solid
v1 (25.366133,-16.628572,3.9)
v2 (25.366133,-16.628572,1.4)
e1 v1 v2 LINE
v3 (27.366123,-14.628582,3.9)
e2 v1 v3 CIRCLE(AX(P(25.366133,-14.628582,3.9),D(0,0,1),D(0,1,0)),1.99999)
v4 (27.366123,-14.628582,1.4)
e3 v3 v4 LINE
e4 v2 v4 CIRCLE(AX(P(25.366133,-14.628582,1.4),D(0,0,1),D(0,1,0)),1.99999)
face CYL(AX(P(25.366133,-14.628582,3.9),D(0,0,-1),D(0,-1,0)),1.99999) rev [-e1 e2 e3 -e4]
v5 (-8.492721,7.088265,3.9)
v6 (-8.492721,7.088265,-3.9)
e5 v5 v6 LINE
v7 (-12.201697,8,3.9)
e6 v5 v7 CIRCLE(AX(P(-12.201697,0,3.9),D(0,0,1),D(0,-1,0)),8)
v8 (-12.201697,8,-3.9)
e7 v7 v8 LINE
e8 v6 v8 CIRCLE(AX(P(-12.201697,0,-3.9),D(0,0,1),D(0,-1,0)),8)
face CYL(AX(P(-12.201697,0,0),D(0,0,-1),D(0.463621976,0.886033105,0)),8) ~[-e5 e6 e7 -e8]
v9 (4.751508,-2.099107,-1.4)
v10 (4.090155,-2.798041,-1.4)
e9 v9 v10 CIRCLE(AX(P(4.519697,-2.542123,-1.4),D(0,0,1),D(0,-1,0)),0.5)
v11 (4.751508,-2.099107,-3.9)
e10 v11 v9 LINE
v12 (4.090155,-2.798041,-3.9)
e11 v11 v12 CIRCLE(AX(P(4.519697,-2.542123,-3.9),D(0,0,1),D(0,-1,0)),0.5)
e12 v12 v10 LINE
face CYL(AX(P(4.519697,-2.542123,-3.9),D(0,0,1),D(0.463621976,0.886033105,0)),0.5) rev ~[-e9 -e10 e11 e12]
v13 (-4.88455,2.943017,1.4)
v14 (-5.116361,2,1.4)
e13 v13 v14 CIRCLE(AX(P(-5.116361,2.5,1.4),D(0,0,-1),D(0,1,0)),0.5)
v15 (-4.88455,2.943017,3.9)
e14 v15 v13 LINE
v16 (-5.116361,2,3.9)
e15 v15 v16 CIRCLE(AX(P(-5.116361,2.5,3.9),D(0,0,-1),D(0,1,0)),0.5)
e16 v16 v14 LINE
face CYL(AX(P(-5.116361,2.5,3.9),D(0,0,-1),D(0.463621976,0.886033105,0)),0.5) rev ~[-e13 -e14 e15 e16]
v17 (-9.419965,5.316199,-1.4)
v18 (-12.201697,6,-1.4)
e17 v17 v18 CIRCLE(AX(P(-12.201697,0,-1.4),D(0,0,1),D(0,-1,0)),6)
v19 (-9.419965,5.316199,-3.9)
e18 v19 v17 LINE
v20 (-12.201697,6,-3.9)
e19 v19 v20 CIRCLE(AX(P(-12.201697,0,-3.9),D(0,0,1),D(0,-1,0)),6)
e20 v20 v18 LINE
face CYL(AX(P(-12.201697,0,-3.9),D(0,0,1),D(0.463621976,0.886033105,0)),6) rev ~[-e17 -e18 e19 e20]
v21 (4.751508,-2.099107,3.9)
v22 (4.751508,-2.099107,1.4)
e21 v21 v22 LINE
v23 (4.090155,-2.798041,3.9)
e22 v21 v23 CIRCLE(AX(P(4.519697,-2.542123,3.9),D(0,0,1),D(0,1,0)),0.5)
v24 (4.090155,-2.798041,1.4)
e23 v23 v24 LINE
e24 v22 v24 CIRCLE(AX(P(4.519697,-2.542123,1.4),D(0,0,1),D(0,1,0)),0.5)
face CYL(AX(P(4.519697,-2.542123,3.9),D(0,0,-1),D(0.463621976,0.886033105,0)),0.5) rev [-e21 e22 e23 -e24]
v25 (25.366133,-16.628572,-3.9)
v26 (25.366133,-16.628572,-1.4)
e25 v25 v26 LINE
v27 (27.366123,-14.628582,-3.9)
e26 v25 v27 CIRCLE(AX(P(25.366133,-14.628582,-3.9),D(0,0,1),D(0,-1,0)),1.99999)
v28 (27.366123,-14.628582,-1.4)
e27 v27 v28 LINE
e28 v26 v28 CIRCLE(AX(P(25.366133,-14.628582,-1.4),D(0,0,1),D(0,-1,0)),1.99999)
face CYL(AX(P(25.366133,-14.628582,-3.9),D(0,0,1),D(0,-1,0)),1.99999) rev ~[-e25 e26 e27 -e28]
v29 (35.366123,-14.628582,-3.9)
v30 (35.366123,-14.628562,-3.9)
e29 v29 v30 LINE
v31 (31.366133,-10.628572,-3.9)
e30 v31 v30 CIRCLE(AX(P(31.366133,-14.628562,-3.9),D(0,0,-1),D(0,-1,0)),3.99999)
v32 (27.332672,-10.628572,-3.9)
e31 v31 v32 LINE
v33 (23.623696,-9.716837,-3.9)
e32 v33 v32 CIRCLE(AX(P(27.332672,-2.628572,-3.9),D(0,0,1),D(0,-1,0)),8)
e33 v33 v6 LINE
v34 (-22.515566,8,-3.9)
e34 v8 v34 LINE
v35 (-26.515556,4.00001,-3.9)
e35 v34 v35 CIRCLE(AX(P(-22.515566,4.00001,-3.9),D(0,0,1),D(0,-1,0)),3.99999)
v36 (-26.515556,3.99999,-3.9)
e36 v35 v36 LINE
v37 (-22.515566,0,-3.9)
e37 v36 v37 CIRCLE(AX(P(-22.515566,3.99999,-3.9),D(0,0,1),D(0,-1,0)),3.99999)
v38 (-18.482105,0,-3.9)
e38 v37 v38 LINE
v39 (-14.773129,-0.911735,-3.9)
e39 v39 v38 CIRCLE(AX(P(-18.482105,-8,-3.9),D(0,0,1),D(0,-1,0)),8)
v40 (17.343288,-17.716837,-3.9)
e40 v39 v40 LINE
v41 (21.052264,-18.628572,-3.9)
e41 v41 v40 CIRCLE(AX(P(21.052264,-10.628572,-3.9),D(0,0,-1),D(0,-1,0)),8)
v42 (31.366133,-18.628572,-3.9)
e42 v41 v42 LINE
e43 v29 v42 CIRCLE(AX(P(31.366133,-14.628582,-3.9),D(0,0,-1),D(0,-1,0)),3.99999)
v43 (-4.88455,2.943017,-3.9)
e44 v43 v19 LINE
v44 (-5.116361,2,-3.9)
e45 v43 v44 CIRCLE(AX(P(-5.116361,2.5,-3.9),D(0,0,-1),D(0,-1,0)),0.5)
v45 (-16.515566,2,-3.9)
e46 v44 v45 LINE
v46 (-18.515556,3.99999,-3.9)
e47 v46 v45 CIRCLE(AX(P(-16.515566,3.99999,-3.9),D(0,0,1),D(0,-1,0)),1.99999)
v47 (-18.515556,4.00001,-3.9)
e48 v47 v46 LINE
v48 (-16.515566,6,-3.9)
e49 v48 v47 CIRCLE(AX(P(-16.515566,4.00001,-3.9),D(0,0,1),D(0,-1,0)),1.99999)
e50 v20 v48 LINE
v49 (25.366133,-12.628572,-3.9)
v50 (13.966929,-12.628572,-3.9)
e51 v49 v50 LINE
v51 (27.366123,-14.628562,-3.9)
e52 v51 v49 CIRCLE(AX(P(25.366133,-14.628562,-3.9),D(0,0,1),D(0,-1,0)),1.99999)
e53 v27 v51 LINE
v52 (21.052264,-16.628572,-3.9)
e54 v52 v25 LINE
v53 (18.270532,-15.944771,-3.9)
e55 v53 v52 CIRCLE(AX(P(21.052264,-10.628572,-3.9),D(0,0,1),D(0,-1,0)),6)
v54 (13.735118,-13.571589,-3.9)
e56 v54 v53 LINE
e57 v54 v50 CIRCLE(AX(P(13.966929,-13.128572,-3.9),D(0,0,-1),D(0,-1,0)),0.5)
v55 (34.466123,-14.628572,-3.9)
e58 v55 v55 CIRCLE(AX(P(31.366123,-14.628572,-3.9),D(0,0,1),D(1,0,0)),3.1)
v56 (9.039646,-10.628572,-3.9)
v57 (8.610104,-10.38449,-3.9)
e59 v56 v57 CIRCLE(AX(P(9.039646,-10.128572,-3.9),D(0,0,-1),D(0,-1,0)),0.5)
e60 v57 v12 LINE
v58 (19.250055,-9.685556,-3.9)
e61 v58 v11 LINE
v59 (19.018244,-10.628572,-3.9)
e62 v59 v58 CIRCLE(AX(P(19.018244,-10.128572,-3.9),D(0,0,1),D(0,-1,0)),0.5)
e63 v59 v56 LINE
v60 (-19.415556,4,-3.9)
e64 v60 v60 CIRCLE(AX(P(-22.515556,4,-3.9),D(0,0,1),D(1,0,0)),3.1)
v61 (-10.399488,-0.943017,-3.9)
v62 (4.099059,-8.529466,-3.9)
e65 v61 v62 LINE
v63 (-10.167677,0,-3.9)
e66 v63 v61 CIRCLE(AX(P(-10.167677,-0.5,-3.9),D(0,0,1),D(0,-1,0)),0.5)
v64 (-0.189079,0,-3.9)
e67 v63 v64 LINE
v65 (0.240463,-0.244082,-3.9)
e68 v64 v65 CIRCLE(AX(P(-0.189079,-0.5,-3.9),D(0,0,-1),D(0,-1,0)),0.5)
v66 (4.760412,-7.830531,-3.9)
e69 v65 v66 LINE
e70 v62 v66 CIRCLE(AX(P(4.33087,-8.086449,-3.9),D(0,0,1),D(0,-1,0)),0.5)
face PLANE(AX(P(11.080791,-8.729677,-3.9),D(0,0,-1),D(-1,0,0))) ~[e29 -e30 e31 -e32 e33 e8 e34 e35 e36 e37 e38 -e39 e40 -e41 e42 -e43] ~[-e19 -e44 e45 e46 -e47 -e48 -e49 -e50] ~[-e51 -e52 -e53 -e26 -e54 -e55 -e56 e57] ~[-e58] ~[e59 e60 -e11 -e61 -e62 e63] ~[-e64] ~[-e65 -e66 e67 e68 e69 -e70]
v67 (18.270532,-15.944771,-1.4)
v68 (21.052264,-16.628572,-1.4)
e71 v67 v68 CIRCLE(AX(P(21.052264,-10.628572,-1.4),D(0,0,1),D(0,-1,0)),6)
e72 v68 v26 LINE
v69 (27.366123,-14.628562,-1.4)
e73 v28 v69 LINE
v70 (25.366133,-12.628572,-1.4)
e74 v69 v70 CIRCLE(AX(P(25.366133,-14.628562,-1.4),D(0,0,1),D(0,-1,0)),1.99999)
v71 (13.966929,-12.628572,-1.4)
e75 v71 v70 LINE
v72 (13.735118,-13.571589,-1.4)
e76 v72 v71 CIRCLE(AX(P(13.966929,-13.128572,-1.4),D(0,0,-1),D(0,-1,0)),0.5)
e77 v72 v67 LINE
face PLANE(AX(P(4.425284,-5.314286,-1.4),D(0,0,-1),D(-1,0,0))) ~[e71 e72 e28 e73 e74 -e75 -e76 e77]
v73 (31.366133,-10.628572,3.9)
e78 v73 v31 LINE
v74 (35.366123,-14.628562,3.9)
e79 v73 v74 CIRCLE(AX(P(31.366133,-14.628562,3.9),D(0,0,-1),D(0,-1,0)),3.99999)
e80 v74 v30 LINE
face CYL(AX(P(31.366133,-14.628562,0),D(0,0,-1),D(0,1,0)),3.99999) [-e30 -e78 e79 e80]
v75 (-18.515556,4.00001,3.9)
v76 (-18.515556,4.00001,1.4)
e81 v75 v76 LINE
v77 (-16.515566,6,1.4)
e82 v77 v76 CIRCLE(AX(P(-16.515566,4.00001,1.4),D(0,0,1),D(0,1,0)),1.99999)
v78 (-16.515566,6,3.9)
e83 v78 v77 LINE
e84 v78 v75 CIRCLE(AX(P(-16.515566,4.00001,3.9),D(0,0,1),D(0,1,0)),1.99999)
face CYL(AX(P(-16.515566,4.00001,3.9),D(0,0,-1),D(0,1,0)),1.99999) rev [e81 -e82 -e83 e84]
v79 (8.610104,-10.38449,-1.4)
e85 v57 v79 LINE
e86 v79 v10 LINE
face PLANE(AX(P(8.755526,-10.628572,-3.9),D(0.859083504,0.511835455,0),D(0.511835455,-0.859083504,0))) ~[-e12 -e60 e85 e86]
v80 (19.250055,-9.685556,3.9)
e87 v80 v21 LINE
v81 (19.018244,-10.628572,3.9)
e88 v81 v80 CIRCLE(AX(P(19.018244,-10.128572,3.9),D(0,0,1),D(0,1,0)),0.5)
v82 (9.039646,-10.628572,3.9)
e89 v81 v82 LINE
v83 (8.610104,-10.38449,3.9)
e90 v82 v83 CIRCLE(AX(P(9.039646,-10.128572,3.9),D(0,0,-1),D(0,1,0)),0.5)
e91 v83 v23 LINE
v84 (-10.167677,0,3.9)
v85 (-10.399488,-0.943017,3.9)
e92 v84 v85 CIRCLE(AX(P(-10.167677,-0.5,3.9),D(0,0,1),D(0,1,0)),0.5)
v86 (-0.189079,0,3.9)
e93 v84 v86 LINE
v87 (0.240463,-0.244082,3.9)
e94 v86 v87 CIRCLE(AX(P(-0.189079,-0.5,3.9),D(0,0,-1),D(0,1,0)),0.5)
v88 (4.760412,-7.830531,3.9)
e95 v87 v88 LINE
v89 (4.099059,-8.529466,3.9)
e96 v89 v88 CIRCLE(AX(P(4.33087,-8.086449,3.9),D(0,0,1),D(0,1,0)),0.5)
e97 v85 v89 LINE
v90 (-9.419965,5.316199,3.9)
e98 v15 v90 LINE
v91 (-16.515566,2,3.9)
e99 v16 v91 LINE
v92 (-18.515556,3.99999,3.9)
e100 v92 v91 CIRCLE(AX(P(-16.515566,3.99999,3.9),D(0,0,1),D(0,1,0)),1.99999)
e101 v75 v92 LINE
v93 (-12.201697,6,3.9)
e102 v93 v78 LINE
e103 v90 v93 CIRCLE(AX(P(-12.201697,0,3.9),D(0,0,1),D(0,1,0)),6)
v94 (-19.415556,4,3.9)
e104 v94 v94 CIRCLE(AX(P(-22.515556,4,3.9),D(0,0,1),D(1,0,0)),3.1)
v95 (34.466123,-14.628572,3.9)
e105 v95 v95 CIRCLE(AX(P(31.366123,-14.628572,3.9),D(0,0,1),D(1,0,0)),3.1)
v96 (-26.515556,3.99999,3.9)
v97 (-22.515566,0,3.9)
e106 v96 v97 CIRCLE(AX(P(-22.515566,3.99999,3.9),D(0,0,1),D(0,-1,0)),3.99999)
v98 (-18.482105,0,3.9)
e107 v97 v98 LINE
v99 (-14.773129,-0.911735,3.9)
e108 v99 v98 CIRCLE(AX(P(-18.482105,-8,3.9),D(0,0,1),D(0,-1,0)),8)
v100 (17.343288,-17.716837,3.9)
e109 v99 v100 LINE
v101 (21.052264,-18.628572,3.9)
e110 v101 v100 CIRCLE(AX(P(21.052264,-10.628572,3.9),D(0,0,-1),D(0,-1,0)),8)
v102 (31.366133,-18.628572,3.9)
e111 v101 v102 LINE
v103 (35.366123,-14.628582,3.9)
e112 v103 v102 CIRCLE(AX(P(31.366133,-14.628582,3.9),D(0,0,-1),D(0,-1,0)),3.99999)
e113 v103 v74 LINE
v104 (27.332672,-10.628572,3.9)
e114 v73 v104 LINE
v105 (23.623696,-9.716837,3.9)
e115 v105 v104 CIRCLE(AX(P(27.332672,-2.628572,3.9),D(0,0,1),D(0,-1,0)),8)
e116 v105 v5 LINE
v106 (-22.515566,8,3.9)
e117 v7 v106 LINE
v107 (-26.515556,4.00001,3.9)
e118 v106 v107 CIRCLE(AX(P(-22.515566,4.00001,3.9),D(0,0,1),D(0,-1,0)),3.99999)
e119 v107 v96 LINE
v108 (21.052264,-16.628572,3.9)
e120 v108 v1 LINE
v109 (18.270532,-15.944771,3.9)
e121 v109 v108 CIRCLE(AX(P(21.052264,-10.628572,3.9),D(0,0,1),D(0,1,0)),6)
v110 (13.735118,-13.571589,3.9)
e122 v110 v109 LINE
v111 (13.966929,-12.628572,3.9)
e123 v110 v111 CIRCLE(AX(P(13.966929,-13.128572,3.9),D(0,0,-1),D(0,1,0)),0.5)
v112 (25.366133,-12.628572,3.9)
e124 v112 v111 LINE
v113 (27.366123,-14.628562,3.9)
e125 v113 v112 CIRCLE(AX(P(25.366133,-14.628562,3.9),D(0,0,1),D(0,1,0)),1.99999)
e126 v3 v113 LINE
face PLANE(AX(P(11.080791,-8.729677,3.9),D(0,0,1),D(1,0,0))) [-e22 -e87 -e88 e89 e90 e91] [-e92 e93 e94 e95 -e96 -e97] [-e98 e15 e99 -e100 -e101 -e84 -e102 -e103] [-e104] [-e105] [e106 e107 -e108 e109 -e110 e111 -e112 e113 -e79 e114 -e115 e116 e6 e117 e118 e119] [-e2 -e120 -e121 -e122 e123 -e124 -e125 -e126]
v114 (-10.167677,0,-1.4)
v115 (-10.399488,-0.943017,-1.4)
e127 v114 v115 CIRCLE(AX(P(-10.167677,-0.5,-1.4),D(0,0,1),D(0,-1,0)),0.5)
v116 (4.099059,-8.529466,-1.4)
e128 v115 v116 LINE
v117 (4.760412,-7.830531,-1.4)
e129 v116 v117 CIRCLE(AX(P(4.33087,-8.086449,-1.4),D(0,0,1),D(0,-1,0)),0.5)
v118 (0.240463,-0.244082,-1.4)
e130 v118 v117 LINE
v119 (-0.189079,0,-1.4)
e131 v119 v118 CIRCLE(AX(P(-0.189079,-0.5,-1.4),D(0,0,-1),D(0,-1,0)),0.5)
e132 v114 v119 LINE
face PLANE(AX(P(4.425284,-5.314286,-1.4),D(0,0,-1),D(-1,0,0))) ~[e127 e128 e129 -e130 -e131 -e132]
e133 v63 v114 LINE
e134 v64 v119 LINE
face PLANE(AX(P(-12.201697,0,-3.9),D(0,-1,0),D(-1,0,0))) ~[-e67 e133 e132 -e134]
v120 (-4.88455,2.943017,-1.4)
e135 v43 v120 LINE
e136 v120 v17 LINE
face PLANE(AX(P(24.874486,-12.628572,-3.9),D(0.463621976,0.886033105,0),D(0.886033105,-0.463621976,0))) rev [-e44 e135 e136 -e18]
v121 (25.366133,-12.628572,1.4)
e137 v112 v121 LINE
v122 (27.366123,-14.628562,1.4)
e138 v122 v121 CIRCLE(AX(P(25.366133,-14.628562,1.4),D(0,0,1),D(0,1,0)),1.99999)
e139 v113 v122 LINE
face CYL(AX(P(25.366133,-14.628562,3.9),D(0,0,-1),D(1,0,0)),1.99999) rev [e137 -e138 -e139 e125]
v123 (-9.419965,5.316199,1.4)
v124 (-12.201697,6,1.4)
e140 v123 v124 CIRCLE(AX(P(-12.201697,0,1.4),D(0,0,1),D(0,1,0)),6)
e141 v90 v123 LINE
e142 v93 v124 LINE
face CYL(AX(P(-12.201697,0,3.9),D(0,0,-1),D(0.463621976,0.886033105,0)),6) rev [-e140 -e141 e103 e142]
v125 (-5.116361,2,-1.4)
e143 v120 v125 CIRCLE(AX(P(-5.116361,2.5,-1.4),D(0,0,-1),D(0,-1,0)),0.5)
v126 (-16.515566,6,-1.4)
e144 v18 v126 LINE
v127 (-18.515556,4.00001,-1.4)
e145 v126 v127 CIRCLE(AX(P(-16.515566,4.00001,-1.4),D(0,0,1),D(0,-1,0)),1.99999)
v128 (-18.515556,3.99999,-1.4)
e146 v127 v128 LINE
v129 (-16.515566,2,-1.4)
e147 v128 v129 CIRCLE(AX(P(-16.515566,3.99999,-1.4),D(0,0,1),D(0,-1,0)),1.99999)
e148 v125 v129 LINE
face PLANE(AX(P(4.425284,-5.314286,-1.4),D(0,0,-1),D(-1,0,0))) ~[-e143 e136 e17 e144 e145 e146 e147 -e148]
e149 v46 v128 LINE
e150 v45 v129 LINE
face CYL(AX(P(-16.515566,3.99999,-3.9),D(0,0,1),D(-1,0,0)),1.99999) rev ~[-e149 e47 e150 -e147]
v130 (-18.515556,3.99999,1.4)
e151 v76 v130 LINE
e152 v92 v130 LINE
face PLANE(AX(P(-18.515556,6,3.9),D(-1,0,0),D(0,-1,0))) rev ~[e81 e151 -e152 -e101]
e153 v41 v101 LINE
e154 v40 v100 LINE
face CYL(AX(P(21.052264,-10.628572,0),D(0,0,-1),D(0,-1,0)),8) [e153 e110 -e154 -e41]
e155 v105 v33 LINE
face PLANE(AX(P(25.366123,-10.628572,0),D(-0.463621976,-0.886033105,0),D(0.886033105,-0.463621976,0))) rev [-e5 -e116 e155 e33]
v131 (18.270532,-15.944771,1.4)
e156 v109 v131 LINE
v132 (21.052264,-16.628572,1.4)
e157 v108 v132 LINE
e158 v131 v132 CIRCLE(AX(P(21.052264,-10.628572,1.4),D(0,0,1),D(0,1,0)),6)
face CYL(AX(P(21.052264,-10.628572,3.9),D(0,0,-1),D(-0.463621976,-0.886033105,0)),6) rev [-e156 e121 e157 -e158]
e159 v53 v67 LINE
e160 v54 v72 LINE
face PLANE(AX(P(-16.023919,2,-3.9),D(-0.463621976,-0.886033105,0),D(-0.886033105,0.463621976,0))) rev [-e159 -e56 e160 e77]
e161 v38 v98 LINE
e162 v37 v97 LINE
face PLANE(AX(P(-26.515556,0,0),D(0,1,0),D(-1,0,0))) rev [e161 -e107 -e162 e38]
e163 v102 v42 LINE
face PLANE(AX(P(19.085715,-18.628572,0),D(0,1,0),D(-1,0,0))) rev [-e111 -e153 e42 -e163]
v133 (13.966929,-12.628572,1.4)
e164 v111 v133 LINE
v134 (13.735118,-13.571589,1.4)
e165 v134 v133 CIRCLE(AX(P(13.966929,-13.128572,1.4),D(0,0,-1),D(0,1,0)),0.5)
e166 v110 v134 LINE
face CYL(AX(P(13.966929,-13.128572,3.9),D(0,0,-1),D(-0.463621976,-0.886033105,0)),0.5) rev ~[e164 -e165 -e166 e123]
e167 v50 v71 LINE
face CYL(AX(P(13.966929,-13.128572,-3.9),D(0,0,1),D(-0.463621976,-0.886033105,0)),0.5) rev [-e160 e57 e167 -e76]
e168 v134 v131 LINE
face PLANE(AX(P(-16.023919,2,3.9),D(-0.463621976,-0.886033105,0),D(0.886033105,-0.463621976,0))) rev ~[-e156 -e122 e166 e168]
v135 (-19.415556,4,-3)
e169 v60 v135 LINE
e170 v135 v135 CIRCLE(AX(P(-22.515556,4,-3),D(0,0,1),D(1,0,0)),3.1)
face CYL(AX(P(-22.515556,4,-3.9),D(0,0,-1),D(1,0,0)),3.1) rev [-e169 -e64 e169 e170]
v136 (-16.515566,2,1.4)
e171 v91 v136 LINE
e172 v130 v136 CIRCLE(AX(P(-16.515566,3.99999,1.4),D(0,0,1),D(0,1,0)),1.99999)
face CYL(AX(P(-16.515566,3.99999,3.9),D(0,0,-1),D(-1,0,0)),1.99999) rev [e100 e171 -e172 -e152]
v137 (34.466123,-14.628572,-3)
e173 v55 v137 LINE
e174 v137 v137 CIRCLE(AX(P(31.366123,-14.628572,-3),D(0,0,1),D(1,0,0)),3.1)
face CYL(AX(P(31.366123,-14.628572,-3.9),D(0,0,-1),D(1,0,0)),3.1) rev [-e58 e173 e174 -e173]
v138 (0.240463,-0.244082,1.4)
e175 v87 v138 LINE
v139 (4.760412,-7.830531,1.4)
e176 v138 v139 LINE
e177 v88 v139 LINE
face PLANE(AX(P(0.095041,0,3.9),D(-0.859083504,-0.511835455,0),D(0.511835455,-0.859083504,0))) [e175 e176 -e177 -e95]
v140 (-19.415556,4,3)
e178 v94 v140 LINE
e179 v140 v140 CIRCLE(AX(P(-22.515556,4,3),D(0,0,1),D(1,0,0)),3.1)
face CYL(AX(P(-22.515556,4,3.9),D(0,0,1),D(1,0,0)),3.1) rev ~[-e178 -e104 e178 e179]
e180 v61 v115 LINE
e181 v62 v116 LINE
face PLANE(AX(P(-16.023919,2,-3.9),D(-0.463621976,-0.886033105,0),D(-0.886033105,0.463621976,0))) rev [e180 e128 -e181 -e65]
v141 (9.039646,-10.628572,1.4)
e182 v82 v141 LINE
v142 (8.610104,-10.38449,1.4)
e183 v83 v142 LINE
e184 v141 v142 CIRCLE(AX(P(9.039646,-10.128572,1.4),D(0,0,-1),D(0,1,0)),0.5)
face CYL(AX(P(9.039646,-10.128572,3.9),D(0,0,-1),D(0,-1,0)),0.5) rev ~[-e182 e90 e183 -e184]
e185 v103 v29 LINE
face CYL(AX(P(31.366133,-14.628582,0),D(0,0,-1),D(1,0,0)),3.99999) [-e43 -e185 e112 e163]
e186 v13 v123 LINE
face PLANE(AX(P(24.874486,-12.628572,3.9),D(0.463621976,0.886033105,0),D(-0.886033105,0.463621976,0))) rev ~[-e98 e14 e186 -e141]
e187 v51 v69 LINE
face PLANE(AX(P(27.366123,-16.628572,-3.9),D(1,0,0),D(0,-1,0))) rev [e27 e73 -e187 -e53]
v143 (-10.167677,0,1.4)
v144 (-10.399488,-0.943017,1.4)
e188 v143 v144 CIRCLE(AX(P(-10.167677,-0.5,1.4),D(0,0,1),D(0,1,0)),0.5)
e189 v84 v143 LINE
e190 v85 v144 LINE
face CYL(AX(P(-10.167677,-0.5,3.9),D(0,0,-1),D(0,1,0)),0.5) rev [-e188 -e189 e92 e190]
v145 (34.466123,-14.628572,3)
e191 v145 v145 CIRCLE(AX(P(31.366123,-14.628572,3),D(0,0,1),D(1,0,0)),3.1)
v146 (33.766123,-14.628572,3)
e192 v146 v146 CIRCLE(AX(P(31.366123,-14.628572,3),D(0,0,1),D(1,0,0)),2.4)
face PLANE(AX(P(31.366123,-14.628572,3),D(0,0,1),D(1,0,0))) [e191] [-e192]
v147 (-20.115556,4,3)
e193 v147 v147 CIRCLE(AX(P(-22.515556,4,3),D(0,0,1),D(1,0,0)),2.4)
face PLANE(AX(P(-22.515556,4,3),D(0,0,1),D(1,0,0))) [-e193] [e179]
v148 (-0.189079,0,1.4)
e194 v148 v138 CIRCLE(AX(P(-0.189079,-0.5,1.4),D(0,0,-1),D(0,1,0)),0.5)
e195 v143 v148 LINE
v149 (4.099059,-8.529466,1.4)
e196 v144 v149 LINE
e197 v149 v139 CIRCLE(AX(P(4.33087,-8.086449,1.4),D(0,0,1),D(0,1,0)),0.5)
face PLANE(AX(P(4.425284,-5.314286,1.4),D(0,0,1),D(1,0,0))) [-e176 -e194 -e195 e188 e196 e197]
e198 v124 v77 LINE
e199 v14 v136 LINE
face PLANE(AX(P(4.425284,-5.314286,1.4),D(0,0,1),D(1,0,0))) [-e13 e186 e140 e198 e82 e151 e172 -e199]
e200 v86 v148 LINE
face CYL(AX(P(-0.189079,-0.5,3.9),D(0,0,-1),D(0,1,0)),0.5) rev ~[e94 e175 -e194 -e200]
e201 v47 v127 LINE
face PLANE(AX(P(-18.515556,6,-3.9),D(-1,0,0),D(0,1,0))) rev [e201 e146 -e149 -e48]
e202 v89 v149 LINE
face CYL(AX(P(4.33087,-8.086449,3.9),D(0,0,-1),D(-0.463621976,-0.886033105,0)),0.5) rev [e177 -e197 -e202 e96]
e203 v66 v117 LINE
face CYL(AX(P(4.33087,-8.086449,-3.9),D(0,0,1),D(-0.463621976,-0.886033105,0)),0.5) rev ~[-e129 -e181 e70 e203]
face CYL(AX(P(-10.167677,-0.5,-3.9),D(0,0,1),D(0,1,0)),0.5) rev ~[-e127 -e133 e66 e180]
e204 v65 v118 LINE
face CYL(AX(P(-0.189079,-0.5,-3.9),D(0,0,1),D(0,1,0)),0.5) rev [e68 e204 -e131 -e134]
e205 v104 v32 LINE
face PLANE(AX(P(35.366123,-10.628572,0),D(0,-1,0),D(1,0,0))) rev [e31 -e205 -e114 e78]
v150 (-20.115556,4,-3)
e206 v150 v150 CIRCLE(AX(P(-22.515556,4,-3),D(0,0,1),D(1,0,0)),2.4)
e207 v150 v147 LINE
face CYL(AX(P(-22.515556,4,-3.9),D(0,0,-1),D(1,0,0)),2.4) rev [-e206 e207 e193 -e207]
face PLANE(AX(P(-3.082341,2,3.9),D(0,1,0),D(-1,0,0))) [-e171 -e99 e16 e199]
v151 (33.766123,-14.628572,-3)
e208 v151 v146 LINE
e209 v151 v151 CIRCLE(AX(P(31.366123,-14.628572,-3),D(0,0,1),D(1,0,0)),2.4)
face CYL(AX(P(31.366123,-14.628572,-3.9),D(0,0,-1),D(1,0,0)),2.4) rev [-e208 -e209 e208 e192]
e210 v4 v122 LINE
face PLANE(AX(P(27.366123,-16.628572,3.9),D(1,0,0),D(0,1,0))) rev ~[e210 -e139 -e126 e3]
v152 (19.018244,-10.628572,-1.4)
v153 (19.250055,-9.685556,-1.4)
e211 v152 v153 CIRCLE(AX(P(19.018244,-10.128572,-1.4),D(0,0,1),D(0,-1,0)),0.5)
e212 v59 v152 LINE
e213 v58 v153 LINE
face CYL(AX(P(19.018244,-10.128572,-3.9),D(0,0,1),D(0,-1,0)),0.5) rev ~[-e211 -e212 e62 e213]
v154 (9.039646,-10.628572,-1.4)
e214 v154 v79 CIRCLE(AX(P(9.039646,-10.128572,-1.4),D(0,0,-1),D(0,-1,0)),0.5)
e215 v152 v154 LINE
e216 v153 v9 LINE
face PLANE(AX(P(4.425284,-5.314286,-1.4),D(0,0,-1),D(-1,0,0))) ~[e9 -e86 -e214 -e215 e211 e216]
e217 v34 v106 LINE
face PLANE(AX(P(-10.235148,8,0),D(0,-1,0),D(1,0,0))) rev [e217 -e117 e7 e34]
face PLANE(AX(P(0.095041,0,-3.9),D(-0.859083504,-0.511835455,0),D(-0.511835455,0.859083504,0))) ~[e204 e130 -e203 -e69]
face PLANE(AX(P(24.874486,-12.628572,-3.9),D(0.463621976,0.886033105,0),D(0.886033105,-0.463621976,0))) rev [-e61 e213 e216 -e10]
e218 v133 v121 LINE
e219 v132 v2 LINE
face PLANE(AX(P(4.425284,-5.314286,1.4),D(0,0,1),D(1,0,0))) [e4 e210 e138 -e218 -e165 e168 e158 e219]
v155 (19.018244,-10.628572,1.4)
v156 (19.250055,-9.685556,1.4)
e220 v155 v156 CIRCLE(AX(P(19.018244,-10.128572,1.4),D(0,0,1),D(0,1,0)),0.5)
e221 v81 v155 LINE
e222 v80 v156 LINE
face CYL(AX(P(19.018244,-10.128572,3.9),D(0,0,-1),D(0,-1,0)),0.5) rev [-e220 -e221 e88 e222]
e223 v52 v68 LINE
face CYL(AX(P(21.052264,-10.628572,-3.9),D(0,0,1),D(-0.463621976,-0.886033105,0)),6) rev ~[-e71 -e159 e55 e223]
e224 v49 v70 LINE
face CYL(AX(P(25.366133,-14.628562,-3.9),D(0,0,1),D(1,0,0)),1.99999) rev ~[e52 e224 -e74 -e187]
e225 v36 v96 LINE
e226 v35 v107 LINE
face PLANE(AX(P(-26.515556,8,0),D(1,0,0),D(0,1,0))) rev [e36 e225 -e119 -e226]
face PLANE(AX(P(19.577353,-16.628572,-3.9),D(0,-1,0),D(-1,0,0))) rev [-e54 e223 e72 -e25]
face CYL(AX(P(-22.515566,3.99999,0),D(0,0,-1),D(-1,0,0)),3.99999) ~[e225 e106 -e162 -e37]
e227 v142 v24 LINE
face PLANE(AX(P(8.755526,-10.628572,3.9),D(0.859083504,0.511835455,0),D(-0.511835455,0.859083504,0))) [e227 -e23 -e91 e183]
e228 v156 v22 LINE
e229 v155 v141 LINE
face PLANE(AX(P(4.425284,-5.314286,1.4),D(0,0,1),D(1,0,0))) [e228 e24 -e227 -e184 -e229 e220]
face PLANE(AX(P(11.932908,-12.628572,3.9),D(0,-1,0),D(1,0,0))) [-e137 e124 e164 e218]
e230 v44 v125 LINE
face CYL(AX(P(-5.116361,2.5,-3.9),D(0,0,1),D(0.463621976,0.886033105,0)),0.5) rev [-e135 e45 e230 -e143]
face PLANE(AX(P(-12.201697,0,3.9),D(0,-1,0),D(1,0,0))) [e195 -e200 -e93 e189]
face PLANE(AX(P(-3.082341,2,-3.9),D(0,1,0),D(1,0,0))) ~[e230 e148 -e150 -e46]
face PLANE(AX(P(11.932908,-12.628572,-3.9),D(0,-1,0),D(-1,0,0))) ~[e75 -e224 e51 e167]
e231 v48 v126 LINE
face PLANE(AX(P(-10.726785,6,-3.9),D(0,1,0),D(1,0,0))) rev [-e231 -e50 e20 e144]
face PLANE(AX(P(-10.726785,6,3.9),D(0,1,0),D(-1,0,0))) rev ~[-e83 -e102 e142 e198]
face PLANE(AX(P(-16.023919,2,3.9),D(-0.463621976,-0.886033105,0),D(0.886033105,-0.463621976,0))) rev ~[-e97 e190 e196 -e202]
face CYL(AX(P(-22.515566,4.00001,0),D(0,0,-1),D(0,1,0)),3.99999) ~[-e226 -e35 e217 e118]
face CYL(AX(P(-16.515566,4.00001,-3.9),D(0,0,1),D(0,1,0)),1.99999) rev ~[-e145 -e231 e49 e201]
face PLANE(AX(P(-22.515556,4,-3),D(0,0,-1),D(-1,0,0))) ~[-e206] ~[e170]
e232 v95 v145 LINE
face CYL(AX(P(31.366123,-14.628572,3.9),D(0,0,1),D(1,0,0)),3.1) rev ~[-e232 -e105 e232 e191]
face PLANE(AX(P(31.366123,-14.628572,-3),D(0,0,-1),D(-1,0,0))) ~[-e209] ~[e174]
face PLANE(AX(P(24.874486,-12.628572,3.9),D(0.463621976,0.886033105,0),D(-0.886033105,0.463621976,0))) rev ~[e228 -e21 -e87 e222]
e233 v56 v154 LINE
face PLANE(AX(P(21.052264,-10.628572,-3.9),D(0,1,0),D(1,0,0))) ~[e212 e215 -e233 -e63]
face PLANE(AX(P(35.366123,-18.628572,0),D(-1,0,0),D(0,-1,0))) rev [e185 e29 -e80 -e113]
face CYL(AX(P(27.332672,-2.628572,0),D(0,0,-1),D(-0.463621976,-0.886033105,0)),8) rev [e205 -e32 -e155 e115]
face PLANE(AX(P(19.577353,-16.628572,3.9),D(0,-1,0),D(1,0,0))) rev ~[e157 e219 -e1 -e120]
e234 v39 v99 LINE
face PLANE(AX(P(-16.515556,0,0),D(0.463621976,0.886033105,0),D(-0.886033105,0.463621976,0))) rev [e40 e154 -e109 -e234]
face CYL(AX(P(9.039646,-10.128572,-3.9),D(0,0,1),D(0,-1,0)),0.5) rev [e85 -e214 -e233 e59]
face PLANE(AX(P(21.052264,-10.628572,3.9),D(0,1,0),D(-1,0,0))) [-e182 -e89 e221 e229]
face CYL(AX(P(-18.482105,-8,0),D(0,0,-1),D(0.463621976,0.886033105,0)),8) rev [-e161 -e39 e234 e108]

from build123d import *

# Parameters (mm, degrees)
F1_DEPTH  = 3.9
F3_DEPTH  = 2.5
F5_DEPTH  = 2.5
F6_R      = 8
F7_R      = 3.99999
F8_R      = 2.4
F9_DEPTH  = 3.901
F8_R_2    = 3.1
F10_DEPTH = 0.9
F12_R     = 1.99999
F13_R     = 6
F14_R     = 0.5


# Not quite as in the source:
# - a fillet or chamfer is up to 0.001 mm smaller than in the source, because OpenCascade refuses the exact size


with BuildPart() as f1:
    # F0 (on Top) → F1 (new body)
    with BuildSketch(Plane.XY):
        Polygon((-10.2351482974, 8), (-26.5155562797, 8), (-26.5155562797, 0), (-16.5155562797, 0), (19.0857153862, -18.6285724837), (35.3661233686, -18.6285724837), (35.3661233686, -10.6285724837), (25.3661233686, -10.6285724837), align=None)
    extrude(amount=F1_DEPTH)

    # F2 (on face) → F3 (cut)
    with BuildSketch(Plane.XY.offset(3.9)):
        Polygon((24.8744862124, -12.6285724837), (-10.7267854535, 6), (-18.5155562797, 6), (-18.5155562797, 2), (-16.0239191236, 2), (19.5773525424, -16.6285724837), (27.3661233686, -16.6285724837), (27.3661233686, -12.6285724837), align=None)
    extrude(amount=-F3_DEPTH, mode=Mode.SUBTRACT)

    # F4 (on face) → F5 (join, through all)
    with BuildSketch(Plane.XY.offset(3.9)):
        Polygon((11.9329081391, -12.6285724837), (24.8744862124, -12.6285724837), (21.0522640108, -10.6285724837), (8.7555263004, -10.6285724837), (3.1855427267, -1.2797066451), (0.7398811514, 0), (0.0950407885, 0), (5.6650243622, -9.3488658386), align=None)
        Polygon((-12.201696922, 0), (0.0950407885, 0), (-0.1970488953, 0.4902540968), (-3.0823410503, 2), (-16.0239191236, 2), align=None)
        Polygon((-0.1970488953, 0.4902540968), (0.0950407885, 0), (0.7398811514, 0), align=None)
    extrude(amount=-F5_DEPTH)

    # F6
    f6_edges = [f1.edges().sort_by_distance(p)[0] for p in [
        (-10.235148, 8, 1.95),
        (25.366123, -10.628572, 1.95),
        (19.085715, -18.628572, 1.95),
        (-16.515556, 0, 1.95),
    ]]
    fillet(f6_edges, radius=F6_R)

    # F7 (radius 4 in the source; OpenCascade refuses exactly that, so slightly less here)
    f7_edges = [f1.edges().sort_by_distance(p)[0] for p in [
        (-26.515556, 8, 1.95),
        (-26.515556, 0, 1.95),
        (35.366123, -10.628572, 1.95),
        (35.366123, -18.628572, 1.95),
    ]]
    fillet(f7_edges, radius=F7_R)

    # F8 (on face) → F9 (cut, through all)
    with BuildSketch(Plane.XY.offset(3.9)):
        with Locations((-22.5155562797, 4)):
            Circle(F8_R)
        with Locations((31.3661233686, -14.6285724837)):
            Circle(F8_R)
    extrude(amount=-F9_DEPTH, mode=Mode.SUBTRACT)

    # F8 (on face) → F10 (cut)
    with BuildSketch(Plane.XY.offset(3.9)):
        with Locations((-22.5155562797, 4)):
            Circle(F8_R_2)
        with Locations((-22.5155562797, 4)):
            Circle(F8_R, mode=Mode.SUBTRACT)
        with Locations((31.3661233686, -14.6285724837)):
            Circle(F8_R_2)
        with Locations((31.3661233686, -14.6285724837)):
            Circle(F8_R, mode=Mode.SUBTRACT)
    extrude(amount=-F10_DEPTH, mode=Mode.SUBTRACT)

    # F11: F1 across face


with BuildPart() as f1_1:
    add(f1.part)
    add(f1.part.mirror(Plane(origin=(4.4252835444, -5.3142862419, 0), x_dir=(1, 0, 0), z_dir=(0, 0, -1))))

    # F12 (radius 2 in the source; OpenCascade refuses exactly that, so slightly less here)
    f12_edges = [f1_1.edges().sort_by_distance(p)[0] for p in [
        (27.366123, -16.628572, 2.65),
        (27.366123, -12.628572, 2.65),
        (-18.515556, 2, 2.65),
        (-18.515556, 6, 2.65),
        (-18.515556, 2, -2.65),
        (-18.515556, 6, -2.65),
        (27.366123, -16.628572, -2.65),
        (27.366123, -12.628572, -2.65),
    ]]
    fillet(f12_edges, radius=F12_R)

    # F13
    f13_edges = [f1_1.edges().sort_by_distance(p)[0] for p in [
        (19.577353, -16.628572, -2.65),
        (-10.726785, 6, -2.65),
        (-10.726785, 6, 2.65),
        (19.577353, -16.628572, 2.65),
    ]]
    fillet(f13_edges, radius=F13_R)

    # F14
    f14_edges = [f1_1.edges().sort_by_distance(p)[0] for p in [
        (8.755526, -10.628572, 2.65),
        (21.052264, -10.628572, 2.65),
        (3.185543, -1.279707, 2.65),
        (11.932908, -12.628572, 2.65),
        (-12.201697, 0, 2.65),
        (0.095041, 0, 2.65),
        (5.665024, -9.348866, 2.65),
        (-3.082341, 2, 2.65),
        (-3.082341, 2, -2.65),
        (21.052264, -10.628572, -2.65),
        (-12.201697, 0, -2.65),
        (11.932908, -12.628572, -2.65),
        (8.755526, -10.628572, -2.65),
        (3.185543, -1.279707, -2.65),
        (0.095041, 0, -2.65),
        (5.665024, -9.348866, -2.65),
    ]]
    fillet(f14_edges, radius=F14_R)


solid = f1_1.part
